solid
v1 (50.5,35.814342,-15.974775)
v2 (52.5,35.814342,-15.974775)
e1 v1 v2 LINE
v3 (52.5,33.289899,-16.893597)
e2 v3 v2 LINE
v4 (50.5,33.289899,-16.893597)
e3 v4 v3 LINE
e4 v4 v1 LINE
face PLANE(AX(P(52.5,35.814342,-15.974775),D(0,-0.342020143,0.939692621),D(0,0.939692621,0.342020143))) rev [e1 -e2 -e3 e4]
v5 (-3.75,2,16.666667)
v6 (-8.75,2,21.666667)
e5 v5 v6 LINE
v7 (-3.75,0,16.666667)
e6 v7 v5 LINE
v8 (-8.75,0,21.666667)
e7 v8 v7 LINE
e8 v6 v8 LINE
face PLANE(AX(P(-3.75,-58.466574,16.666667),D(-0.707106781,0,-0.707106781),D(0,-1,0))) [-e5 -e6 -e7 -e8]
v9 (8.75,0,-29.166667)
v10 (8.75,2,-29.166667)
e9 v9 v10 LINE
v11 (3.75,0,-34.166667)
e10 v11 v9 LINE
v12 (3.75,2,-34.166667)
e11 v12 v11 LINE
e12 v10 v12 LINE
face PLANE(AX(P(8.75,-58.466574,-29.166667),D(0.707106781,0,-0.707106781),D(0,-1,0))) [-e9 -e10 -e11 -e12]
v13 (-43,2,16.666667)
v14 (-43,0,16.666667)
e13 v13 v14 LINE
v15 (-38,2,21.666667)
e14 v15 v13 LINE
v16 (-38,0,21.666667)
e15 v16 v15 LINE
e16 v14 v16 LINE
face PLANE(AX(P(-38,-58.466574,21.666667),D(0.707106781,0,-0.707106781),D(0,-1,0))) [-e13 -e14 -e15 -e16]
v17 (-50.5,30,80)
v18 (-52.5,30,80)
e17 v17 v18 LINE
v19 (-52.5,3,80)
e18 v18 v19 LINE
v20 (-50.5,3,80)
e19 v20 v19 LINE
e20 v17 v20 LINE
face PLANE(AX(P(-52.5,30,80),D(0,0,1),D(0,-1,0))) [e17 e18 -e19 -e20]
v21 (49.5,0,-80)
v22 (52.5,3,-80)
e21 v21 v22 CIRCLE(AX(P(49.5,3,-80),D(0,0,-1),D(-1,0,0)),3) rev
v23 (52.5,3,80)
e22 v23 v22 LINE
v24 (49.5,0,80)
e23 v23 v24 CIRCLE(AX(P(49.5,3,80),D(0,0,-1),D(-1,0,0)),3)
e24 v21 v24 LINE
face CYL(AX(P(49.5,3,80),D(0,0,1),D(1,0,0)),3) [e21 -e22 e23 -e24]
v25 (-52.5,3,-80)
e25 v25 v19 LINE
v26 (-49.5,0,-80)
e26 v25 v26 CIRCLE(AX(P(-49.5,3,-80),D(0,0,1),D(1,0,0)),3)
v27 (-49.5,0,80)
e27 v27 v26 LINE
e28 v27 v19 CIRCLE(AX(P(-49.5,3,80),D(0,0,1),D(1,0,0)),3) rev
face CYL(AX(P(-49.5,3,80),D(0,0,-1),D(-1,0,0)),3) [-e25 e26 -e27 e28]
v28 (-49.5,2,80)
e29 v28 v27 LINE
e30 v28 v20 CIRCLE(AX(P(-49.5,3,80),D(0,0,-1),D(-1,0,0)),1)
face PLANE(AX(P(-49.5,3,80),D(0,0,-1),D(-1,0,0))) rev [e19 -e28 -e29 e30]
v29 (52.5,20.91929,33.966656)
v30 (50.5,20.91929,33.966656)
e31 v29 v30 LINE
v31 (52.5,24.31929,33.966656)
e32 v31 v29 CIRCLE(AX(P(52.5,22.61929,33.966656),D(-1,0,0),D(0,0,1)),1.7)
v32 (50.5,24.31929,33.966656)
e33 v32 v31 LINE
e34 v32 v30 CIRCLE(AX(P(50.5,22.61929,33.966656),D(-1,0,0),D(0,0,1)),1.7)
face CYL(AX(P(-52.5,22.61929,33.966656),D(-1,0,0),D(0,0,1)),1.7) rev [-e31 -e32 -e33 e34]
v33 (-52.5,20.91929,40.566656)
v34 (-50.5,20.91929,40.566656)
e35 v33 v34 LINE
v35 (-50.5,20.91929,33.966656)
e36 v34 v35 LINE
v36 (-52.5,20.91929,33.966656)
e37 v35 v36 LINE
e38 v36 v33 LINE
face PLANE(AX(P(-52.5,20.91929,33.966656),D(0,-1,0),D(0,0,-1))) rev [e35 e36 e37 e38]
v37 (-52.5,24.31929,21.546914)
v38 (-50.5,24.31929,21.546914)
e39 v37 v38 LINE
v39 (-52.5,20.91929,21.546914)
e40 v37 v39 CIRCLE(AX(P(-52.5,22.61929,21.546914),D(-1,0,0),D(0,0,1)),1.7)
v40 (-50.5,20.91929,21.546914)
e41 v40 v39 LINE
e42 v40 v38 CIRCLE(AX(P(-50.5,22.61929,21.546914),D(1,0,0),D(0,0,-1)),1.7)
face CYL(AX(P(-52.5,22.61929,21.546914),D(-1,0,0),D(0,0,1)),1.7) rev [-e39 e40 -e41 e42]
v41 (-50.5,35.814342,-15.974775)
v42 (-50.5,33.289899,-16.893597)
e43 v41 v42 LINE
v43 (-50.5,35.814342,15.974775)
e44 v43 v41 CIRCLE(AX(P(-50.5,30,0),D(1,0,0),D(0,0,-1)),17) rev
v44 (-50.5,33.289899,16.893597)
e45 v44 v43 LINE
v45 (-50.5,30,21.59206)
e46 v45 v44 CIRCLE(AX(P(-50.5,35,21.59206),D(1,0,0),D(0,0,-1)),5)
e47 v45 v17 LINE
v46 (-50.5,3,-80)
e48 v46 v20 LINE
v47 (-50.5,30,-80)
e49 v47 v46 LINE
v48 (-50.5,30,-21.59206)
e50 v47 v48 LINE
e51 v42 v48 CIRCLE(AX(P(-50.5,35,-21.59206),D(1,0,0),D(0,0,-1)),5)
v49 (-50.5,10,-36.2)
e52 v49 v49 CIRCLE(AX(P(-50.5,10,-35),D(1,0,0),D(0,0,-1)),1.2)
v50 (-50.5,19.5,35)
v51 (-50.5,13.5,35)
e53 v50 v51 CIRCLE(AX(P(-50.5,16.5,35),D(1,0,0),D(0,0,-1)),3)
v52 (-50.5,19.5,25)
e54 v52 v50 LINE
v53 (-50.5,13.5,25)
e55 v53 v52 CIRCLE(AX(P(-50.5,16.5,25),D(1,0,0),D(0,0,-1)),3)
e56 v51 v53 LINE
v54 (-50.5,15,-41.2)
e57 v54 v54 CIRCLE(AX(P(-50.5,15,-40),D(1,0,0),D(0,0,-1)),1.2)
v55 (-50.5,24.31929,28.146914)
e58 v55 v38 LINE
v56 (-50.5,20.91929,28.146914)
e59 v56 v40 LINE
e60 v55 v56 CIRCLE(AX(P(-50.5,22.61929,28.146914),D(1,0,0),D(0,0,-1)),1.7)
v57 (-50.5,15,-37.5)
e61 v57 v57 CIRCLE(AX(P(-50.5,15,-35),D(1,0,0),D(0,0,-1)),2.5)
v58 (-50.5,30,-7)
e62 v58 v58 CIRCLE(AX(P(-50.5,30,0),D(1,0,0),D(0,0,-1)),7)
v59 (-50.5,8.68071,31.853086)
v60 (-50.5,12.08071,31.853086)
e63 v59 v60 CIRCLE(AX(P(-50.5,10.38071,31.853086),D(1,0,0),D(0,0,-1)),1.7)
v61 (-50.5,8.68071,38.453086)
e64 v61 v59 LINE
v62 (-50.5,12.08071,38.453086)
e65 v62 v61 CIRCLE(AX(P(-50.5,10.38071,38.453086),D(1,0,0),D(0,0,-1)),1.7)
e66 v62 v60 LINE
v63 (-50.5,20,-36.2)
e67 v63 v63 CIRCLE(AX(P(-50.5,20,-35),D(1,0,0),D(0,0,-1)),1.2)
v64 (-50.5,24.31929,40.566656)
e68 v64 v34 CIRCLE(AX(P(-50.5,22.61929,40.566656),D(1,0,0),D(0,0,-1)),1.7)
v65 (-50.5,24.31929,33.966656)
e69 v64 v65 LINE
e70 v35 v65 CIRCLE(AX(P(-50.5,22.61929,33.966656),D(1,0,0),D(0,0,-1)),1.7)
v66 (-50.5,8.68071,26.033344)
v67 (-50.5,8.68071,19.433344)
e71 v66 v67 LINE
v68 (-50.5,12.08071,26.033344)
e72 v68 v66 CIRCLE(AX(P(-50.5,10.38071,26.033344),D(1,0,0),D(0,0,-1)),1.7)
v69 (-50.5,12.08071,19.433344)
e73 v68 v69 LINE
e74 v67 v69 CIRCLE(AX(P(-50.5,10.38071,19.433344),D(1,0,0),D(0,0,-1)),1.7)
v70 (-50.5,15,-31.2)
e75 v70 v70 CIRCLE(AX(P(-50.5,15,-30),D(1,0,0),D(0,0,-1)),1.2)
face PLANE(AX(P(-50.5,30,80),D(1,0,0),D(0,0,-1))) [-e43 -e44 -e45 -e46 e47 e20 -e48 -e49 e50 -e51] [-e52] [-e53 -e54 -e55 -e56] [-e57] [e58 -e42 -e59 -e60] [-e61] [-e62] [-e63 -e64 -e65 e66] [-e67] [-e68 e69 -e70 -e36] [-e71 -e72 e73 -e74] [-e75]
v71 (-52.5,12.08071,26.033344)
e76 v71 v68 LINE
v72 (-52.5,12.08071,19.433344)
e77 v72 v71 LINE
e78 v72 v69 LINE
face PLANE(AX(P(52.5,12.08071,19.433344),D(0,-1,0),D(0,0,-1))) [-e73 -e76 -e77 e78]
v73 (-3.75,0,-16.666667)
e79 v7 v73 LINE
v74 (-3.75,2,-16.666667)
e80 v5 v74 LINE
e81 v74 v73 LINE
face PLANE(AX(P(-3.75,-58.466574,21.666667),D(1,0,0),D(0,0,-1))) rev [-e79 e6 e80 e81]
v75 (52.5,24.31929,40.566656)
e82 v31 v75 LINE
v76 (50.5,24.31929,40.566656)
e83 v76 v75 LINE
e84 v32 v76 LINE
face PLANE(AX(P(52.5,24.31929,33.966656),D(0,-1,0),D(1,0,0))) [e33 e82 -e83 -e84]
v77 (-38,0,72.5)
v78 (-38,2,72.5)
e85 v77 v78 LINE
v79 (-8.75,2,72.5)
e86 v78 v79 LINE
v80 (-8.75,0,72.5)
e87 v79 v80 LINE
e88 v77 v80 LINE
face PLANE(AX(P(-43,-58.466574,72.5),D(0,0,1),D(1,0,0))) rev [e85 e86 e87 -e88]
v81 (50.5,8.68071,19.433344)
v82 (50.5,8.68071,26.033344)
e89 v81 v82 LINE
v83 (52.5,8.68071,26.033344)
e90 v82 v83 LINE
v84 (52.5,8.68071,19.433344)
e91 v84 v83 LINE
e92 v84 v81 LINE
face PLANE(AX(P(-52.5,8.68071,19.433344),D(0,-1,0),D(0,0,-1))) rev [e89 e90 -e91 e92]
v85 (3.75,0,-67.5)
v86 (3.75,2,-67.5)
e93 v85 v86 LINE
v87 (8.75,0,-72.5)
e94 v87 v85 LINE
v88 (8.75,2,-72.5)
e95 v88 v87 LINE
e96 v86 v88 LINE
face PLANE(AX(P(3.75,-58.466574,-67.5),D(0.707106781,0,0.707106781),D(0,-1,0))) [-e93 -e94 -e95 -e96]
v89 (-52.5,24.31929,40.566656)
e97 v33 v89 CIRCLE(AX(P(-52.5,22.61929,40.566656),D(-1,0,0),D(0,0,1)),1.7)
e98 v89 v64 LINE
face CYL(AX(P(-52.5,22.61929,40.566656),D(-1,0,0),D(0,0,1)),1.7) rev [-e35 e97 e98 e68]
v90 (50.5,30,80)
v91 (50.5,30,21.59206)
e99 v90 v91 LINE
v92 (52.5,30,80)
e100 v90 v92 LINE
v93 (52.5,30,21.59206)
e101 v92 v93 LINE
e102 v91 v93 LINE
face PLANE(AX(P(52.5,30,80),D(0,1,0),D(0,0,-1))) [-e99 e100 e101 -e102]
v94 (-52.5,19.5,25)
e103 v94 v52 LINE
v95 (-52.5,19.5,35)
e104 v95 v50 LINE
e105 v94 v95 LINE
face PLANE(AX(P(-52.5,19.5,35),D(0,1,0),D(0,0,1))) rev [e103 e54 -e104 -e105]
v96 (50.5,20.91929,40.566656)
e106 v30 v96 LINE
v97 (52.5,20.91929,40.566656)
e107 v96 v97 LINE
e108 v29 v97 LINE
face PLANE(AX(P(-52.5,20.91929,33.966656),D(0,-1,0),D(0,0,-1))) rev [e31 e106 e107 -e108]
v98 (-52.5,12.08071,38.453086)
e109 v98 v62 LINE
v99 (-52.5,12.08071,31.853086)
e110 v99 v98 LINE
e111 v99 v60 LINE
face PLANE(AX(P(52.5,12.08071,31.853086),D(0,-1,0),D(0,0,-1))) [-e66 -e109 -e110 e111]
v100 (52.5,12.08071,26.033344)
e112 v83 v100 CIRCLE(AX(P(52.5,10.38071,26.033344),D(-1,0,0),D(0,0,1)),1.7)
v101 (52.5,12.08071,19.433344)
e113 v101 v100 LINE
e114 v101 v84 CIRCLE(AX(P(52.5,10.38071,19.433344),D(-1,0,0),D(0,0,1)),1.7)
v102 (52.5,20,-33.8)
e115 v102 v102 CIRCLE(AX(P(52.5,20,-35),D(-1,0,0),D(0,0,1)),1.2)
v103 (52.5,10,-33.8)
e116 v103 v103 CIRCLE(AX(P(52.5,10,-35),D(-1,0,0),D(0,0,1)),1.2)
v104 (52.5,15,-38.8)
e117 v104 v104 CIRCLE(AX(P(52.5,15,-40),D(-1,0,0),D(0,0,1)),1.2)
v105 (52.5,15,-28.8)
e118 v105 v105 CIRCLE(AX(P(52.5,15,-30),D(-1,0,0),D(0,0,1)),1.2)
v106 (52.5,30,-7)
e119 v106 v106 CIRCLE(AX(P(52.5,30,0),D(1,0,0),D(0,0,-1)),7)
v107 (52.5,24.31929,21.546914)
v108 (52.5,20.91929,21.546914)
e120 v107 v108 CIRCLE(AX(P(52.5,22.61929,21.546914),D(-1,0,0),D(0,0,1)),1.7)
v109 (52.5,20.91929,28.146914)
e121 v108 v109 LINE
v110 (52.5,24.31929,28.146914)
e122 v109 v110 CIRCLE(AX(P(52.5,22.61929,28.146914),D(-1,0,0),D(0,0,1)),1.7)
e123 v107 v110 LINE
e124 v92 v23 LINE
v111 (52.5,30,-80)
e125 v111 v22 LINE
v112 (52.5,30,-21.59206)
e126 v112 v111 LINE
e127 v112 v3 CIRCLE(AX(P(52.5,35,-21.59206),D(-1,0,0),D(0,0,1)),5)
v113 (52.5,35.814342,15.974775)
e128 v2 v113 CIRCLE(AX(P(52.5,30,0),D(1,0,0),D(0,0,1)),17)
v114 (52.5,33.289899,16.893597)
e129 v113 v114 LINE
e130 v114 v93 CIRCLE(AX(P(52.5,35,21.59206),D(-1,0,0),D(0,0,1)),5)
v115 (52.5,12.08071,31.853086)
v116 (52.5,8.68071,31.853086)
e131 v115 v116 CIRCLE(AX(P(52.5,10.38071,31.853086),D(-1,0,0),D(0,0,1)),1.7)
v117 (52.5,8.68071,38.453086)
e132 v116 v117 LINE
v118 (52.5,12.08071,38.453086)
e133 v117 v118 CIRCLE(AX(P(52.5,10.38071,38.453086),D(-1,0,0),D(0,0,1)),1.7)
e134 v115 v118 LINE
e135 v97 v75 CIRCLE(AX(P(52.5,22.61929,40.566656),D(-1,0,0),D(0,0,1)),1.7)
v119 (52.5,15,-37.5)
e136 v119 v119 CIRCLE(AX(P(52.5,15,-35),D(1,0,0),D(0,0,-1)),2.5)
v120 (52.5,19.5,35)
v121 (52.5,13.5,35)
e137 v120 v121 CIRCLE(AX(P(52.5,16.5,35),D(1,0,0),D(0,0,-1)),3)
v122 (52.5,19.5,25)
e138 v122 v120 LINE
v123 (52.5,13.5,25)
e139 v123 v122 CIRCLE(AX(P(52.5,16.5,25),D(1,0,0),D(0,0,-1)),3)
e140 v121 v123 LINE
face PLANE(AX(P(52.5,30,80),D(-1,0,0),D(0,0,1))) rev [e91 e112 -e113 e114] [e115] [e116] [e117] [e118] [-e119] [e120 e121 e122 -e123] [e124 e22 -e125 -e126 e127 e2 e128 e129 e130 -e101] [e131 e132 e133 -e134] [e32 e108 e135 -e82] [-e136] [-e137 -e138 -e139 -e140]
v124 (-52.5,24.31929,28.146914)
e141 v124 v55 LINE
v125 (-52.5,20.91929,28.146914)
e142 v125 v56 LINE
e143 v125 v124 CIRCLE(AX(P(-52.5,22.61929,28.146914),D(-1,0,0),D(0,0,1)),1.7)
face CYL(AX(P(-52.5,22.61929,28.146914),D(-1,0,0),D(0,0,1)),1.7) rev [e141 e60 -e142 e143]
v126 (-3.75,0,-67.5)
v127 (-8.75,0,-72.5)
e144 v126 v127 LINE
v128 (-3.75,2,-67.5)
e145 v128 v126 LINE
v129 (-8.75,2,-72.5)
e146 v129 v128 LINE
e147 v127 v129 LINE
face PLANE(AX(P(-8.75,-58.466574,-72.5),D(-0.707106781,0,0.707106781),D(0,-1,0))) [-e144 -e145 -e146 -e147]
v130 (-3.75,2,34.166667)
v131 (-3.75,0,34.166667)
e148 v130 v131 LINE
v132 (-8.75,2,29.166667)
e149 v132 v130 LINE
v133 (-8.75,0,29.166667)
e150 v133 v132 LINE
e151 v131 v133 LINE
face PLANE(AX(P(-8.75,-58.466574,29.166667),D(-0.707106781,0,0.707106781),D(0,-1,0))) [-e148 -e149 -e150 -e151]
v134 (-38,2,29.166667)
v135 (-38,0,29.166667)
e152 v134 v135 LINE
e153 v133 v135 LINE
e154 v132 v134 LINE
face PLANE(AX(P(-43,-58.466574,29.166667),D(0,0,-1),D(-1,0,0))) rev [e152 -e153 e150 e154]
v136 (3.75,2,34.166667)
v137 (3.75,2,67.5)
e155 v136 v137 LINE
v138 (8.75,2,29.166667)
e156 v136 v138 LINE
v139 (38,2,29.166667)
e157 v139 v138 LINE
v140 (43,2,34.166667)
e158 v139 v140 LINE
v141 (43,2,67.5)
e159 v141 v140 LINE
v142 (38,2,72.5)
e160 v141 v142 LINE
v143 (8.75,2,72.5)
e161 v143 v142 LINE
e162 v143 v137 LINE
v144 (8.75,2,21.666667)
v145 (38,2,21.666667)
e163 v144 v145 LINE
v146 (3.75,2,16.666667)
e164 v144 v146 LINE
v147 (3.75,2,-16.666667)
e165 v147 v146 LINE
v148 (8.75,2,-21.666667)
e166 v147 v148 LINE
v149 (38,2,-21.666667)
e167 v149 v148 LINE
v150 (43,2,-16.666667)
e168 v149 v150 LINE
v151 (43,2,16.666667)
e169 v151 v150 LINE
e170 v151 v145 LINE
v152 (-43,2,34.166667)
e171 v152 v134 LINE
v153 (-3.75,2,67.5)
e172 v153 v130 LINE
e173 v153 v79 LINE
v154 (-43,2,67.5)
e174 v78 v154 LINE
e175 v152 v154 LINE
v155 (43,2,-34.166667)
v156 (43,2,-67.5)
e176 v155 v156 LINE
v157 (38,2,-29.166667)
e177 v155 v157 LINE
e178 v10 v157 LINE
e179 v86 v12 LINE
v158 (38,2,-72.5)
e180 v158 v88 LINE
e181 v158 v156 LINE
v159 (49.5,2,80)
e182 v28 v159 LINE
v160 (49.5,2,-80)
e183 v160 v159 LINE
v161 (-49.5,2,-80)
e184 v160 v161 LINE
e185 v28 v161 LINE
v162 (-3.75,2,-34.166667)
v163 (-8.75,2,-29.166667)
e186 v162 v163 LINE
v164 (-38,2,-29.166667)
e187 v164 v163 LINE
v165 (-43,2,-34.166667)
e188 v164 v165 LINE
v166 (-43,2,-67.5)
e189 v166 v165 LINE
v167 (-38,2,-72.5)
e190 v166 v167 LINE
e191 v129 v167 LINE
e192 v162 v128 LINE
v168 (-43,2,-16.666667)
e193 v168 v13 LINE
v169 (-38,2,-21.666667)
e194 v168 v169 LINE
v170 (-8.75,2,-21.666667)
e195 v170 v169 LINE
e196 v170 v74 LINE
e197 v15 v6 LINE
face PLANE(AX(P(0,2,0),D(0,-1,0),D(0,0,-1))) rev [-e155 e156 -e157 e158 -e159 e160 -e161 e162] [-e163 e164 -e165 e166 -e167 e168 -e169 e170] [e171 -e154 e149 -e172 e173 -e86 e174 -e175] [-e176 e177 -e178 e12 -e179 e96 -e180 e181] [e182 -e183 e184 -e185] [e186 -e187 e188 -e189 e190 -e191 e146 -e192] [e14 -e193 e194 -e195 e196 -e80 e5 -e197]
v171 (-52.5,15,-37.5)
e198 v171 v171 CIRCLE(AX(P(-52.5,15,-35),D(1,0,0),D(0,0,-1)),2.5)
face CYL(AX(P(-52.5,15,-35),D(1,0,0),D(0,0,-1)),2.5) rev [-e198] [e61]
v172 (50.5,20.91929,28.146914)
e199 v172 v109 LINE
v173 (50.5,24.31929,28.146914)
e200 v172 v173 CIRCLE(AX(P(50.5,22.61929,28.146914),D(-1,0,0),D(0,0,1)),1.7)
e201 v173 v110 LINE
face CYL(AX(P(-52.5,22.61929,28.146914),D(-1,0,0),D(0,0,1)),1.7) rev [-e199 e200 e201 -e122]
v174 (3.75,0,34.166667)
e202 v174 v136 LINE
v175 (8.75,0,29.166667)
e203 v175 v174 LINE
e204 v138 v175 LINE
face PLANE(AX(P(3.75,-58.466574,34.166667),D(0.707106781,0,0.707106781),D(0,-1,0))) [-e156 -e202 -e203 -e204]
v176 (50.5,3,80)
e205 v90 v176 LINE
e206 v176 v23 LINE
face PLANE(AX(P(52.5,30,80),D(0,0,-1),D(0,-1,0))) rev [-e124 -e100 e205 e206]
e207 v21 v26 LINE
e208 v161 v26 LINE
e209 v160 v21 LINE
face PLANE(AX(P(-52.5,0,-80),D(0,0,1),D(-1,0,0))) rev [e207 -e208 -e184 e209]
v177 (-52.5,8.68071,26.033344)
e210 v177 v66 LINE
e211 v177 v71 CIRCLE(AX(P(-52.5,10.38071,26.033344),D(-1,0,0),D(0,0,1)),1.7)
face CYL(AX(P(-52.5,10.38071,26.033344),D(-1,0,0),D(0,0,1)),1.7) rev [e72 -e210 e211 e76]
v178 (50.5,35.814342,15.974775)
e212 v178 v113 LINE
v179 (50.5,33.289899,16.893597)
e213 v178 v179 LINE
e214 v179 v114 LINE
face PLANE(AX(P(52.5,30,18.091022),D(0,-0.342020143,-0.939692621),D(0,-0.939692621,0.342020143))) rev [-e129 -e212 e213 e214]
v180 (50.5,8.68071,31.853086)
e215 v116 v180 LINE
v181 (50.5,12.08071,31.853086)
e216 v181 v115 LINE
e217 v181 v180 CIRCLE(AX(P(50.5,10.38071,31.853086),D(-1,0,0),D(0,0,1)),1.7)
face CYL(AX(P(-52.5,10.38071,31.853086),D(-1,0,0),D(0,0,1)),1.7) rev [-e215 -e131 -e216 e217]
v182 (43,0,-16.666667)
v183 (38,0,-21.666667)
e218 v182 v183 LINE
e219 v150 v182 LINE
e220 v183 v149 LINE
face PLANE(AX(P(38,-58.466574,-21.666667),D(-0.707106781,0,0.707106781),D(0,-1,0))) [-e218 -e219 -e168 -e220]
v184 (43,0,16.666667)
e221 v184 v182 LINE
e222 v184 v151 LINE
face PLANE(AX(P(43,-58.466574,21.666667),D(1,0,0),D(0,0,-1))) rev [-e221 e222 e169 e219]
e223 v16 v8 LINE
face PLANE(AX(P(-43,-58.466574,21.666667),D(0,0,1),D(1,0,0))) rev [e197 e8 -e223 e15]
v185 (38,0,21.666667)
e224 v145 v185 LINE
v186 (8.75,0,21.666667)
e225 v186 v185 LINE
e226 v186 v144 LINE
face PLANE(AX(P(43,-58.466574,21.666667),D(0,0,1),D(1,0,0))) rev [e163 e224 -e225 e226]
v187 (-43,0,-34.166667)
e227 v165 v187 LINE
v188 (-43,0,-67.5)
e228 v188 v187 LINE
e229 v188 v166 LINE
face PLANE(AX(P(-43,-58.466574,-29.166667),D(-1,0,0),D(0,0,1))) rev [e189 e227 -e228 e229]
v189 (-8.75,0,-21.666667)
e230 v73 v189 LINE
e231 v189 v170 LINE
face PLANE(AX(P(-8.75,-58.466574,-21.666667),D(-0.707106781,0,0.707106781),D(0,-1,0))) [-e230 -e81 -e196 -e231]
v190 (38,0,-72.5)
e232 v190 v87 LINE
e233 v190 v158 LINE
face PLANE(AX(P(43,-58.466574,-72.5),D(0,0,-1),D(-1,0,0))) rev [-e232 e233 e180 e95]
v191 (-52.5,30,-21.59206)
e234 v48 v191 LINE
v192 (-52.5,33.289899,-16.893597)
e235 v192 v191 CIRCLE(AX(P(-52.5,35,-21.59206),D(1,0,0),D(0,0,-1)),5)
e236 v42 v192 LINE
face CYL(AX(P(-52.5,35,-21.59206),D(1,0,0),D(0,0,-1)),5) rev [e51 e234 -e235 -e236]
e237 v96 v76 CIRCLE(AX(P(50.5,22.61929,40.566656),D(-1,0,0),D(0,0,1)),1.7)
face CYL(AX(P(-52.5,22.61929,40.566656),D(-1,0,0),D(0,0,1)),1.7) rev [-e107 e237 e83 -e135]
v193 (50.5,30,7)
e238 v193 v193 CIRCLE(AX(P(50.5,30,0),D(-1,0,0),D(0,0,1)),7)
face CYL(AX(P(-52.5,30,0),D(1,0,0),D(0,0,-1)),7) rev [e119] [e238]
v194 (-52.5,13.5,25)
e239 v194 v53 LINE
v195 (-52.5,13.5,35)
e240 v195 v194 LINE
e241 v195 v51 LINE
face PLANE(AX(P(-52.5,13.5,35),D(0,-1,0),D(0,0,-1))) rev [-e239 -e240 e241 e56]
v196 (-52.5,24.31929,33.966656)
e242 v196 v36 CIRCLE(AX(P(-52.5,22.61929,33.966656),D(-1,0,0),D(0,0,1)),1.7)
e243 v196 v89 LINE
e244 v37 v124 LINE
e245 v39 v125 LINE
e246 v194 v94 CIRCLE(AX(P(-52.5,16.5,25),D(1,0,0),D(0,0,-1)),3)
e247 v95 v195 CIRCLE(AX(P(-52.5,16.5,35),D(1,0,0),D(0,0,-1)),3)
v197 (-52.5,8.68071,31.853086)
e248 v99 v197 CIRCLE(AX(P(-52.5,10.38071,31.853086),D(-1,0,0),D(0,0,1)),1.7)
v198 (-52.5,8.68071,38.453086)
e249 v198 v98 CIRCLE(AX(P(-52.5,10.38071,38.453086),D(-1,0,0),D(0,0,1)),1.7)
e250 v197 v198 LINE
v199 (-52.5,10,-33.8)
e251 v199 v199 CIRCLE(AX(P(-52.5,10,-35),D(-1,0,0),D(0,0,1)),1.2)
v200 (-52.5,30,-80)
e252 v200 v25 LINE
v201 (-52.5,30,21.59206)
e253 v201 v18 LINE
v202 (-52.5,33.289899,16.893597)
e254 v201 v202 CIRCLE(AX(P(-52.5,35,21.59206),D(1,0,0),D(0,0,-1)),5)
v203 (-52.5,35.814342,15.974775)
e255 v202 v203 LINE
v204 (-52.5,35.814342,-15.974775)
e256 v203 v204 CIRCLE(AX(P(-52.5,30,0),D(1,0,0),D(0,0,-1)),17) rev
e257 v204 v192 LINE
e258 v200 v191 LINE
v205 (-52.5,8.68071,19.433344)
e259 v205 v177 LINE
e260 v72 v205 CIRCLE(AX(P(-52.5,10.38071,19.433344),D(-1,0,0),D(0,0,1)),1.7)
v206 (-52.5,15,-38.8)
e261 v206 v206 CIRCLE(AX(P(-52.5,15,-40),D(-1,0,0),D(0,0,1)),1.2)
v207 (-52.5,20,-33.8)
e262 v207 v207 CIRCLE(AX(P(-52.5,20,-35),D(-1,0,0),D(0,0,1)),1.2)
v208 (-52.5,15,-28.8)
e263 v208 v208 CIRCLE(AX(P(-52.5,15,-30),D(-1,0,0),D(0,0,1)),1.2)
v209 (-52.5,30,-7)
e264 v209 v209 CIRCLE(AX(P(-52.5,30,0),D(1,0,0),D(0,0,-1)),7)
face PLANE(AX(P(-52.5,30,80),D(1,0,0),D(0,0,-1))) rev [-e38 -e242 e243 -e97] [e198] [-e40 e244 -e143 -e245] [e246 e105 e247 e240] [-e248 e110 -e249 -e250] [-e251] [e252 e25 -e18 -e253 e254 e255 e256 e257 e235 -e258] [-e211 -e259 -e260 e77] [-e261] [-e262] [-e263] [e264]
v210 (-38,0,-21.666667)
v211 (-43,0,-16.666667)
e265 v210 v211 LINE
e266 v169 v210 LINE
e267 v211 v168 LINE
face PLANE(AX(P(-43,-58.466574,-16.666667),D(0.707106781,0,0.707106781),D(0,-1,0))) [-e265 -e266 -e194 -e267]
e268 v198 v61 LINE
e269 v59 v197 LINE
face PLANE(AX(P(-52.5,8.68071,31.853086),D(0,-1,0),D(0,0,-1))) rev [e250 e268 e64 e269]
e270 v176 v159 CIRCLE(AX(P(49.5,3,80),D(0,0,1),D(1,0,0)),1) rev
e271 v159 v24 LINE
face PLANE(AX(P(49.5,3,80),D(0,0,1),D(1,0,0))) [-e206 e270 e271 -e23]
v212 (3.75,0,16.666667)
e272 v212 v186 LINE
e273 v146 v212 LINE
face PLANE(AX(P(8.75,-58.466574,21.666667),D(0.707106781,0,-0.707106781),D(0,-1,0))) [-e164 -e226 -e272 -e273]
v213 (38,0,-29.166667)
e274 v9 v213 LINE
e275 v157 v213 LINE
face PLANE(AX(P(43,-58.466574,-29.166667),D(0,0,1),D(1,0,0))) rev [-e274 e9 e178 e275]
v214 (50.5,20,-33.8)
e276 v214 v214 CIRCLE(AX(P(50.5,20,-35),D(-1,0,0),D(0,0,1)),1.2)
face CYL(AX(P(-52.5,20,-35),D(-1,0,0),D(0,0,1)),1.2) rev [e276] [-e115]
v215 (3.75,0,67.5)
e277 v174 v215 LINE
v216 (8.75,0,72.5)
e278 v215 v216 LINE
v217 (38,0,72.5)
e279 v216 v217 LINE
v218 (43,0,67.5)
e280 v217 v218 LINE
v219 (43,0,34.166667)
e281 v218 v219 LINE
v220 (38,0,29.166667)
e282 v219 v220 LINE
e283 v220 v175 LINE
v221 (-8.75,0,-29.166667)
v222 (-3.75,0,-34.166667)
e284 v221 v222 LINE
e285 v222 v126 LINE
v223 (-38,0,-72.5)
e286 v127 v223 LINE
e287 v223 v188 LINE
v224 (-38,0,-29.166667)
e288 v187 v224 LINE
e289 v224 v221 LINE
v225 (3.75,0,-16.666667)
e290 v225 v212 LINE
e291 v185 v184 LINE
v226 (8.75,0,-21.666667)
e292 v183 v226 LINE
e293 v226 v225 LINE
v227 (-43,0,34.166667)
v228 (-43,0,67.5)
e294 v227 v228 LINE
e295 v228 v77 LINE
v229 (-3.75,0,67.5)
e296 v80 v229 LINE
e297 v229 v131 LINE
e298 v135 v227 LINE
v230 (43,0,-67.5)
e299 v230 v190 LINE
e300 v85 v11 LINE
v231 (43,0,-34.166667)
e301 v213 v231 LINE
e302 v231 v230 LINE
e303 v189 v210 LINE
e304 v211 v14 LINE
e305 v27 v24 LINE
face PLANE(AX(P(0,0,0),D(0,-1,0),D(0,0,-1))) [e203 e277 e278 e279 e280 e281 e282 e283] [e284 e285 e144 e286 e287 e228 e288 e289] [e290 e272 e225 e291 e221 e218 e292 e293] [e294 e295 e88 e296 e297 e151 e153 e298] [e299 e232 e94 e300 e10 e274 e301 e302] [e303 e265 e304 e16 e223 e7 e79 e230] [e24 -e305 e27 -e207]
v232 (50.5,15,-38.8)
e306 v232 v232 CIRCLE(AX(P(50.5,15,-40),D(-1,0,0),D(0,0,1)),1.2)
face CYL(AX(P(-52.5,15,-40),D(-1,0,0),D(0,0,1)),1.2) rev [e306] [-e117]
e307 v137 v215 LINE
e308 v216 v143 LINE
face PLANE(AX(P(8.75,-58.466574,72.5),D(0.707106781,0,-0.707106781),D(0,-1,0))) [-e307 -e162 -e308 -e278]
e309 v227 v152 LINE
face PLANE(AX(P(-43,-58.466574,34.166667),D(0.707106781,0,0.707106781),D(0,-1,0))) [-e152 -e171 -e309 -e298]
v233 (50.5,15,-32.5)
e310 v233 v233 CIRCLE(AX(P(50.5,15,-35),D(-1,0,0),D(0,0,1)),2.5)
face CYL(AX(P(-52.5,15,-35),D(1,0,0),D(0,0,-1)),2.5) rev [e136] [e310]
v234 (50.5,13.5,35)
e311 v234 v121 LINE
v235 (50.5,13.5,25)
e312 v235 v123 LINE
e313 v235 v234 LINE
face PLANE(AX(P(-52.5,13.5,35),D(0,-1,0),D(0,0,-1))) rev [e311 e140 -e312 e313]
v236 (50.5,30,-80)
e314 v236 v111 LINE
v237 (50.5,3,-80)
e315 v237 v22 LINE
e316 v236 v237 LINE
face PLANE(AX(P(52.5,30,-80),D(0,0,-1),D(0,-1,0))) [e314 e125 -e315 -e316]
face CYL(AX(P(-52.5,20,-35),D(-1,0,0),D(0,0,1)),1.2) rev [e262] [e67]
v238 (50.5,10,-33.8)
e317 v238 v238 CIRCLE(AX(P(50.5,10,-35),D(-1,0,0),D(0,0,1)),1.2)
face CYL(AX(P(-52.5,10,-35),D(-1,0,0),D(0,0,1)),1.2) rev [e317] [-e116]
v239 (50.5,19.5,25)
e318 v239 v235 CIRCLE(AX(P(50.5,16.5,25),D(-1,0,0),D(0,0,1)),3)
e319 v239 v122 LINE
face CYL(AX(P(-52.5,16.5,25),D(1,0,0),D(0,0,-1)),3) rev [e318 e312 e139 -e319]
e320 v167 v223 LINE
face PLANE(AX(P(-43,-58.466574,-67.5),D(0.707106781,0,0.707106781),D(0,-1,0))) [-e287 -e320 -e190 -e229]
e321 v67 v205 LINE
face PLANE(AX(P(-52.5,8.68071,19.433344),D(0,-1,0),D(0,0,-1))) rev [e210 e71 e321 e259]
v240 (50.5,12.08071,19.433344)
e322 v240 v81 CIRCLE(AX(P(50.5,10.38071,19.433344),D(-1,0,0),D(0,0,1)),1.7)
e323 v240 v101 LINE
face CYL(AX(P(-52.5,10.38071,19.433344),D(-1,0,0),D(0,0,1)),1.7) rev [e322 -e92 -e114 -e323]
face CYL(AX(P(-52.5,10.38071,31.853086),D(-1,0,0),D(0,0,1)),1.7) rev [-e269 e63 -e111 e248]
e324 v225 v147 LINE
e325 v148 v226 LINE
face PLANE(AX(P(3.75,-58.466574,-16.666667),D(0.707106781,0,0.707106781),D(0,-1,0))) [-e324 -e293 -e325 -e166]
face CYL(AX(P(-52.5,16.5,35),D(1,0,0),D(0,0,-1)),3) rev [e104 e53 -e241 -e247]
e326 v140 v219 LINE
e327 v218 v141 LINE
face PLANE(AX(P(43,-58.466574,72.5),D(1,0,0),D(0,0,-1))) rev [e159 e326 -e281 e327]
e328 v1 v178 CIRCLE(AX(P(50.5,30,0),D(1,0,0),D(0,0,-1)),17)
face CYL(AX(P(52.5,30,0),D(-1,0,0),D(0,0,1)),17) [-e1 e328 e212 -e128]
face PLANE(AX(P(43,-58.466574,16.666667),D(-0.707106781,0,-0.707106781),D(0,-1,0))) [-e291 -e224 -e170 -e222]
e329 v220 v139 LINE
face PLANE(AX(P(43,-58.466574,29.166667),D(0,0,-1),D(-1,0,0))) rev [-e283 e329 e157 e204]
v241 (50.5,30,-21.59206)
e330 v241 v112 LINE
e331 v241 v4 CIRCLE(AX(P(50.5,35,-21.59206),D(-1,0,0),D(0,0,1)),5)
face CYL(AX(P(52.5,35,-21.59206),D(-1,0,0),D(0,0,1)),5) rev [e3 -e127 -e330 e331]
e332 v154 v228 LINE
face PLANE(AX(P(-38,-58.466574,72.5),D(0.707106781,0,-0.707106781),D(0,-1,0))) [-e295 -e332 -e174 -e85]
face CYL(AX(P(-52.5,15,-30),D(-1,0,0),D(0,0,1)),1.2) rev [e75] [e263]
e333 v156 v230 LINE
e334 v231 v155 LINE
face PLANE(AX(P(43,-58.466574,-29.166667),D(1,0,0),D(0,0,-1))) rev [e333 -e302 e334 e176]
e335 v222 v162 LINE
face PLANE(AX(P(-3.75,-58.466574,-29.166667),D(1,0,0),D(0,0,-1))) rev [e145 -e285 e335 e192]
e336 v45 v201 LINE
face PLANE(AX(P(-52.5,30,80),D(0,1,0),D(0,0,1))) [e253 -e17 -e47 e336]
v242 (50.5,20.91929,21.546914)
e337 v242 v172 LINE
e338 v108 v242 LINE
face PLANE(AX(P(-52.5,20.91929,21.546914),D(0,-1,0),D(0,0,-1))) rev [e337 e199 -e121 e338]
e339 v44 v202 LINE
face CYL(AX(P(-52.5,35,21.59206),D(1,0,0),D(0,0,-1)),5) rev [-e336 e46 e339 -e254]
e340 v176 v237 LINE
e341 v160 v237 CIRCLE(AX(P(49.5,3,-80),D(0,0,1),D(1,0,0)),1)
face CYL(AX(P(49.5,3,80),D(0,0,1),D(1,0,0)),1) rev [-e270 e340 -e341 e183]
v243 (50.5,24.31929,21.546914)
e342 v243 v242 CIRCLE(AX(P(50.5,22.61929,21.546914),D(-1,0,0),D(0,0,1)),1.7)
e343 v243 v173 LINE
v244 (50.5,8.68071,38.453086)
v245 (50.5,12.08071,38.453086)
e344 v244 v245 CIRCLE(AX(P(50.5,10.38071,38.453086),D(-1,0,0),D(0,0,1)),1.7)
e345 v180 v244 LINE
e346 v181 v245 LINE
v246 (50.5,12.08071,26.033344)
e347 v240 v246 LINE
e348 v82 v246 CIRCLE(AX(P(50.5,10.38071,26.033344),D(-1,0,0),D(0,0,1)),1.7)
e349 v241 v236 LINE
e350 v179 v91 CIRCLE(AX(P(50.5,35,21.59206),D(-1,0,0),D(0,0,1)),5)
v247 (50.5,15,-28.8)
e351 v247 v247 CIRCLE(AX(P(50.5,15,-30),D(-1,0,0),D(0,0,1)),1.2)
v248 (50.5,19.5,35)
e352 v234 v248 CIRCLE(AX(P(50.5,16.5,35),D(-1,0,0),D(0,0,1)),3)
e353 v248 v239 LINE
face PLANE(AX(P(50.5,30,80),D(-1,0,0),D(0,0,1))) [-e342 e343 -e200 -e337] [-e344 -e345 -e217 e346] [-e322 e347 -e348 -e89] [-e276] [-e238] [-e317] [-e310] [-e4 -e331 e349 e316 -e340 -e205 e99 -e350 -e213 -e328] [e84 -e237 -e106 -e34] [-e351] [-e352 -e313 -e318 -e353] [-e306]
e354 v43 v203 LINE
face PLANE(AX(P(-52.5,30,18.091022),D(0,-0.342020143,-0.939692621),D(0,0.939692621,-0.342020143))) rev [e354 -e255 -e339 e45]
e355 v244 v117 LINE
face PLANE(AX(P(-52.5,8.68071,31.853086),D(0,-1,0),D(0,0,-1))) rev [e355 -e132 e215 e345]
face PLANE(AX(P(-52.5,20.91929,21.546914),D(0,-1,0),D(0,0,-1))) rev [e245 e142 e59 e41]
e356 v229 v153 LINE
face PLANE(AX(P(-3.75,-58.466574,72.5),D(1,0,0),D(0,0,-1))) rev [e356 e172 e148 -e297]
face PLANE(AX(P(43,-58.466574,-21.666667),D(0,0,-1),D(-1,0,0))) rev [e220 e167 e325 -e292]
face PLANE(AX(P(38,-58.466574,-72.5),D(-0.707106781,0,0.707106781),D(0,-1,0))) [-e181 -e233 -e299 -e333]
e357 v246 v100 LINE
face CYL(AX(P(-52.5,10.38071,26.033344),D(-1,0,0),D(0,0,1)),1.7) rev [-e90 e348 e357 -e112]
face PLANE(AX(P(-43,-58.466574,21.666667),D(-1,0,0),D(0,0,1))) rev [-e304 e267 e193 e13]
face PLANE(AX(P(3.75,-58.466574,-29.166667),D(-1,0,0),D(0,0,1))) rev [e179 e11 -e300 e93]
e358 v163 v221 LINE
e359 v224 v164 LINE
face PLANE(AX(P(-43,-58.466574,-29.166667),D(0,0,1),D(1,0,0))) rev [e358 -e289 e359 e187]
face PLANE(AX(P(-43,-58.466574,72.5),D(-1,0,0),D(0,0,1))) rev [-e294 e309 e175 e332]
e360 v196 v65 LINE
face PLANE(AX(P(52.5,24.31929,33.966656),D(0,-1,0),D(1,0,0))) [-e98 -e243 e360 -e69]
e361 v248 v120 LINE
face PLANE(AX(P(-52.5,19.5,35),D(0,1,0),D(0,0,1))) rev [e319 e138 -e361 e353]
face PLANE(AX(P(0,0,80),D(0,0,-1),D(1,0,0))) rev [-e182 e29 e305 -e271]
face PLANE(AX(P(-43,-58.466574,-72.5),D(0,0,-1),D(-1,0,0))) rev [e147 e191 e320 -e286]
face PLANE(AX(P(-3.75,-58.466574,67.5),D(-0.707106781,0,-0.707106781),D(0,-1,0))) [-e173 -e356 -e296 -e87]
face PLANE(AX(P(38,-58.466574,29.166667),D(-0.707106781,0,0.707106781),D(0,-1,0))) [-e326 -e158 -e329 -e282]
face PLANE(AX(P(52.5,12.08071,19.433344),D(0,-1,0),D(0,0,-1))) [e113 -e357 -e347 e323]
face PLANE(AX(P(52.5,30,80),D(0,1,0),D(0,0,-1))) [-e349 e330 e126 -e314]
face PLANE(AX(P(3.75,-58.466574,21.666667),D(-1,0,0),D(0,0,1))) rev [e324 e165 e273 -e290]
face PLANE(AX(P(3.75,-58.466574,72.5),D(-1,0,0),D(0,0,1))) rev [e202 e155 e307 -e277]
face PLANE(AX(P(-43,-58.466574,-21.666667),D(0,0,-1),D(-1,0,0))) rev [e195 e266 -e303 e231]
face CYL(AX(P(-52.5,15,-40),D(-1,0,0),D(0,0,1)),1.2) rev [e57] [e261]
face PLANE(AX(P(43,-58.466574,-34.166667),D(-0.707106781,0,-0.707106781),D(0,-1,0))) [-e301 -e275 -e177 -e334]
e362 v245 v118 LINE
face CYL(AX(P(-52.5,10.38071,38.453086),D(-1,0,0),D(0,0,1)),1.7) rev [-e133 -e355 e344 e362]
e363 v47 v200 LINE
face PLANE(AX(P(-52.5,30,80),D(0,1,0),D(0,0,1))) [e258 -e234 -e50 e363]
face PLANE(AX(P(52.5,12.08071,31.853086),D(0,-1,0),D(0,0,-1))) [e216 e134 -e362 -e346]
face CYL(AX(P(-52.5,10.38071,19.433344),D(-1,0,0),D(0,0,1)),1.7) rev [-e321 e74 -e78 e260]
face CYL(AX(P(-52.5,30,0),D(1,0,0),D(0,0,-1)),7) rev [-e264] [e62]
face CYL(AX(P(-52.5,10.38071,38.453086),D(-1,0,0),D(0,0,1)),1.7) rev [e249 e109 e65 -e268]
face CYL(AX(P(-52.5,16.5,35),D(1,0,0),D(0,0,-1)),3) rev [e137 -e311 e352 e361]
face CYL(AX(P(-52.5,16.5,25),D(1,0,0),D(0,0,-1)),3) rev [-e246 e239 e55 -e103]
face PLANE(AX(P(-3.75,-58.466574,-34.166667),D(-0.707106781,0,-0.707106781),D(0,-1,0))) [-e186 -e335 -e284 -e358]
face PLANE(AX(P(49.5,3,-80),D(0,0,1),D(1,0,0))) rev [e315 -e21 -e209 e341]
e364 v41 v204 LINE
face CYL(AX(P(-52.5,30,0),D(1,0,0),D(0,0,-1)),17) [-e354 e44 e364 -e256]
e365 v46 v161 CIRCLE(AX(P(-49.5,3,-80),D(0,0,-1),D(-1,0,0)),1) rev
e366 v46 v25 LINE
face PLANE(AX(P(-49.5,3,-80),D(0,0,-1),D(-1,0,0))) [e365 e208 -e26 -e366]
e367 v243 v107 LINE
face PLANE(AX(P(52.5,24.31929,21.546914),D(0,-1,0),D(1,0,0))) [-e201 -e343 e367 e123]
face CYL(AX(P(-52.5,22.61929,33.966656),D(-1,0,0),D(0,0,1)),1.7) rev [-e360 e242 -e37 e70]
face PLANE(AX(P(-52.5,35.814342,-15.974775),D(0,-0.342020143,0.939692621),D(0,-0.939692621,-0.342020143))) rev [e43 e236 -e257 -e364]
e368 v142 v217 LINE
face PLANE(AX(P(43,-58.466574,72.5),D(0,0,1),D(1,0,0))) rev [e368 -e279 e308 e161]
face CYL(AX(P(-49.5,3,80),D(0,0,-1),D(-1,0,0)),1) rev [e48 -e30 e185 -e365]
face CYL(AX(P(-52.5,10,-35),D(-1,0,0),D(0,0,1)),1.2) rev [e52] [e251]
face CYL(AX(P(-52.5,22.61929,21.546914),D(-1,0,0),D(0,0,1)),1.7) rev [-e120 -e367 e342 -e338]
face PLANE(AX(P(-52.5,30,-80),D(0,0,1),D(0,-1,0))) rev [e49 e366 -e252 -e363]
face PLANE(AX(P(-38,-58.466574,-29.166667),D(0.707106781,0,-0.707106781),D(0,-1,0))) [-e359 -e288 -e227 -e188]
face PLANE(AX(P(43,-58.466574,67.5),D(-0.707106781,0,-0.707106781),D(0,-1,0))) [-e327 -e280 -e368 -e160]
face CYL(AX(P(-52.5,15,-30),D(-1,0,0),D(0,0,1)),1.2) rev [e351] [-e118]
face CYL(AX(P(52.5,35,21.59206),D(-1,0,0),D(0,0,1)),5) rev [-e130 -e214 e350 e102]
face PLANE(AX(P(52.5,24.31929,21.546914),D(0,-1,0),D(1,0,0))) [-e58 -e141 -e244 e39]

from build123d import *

# Parameters (mm, degrees)
BOSS_EXTRUDE1_DEPTH       = 30
BOSS_EXTRUDE2_DEPTH       = 105
FILLET1_R                 = 5
CONVERT_SOLID2_START      = -80
CONVERT_SOLID2_DEPTH      = 160
SKETCH12_R                = 7
SKETCH12_R_2              = 2.5
AXLE_HOLES_DEPTH          = 141.121375957
SKETCH13_W                = 39.25
SKETCH13_H                = 43.333333333
SKETCH13_H_2              = 43.333333334
WEIGHT_SAVING_HOLES_DEPTH = 2
CHAMFER1_SIZE             = 5
M3_START                  = -52.5
M3_CLEARANCE_SLOT1_DEPTH  = 105
M2_CLEARANCE_HOLE1_D      = 2.4


# Read off the part's stored shape, not the designer's step: Convert-Solid2, M3 Clearance Slot1
with BuildPart() as part:
    # Sketch1 → Boss-Extrude1 (new body)
    with BuildSketch(Plane(origin=(0, 0, 0), x_dir=(1, 0, 0), z_dir=(0, 1, 0))):
        Polygon((-52.5, -80), (0, -80), (52.5, -80), (52.5, 80), (-52.5, 80), align=None)
    extrude(amount=BOSS_EXTRUDE1_DEPTH)

    # Sketch11 → Boss-Extrude2 (add)
    with BuildSketch(Plane(origin=(52.5, 0, 0), x_dir=(0, 0, -1), z_dir=(1, 0, 0))):
        with BuildLine():
            Line((-18.091022132, 30), (-15.974774553, 35.814342437))
            ThreePointArc((-15.974774553, 35.814342437), (0, 47), (15.974774553, 35.814342437))
            Line((15.974774553, 35.814342437), (18.091022132, 30))
            Line((18.091022132, 30), (-18.091022132, 30))
        make_face()
    extrude(amount=-BOSS_EXTRUDE2_DEPTH)

    # Fillet1
    fillet1_edges = [part.edges().sort_by_distance(p)[0] for p in [
        (0, 30, -18.091022132),
        (0, 30, 18.091022132),
    ]]
    fillet(fillet1_edges, radius=FILLET1_R)

    # Convert-Solid2 outline → Convert-Solid2 (cut)
    with BuildSketch(Plane.XY.offset(CONVERT_SOLID2_START)):
        with BuildLine():
            Line((-54, 5.2e-08), (-49.5, 0))
            ThreePointArc((-49.5, 0), (-51.621320344, 0.878679656), (-52.5, 3))
            Line((-52.5, 3), (-52.499999977, 48))
            Line((-52.499999977, 48), (-54, 48))
            Line((-54, 48), (-54, 5.2e-08))
        make_face()
        with BuildLine():
            ThreePointArc((52.5, 3), (51.621320344, 0.878679656), (49.5, 0))
            Line((49.5, 0), (54, 5.2e-08))
            Line((54, 5.2e-08), (54, 48))
            Line((54, 48), (52.499999977, 48))
            Line((52.499999977, 48), (52.5, 3))
        make_face()
        with BuildLine():
            Line((50.5, 3), (50.5, 48))
            Line((50.5, 48), (-50.5, 48))
            Line((-50.5, 48), (-50.5, 3))
            ThreePointArc((-50.5, 3), (-50.207106781, 2.292893219), (-49.5, 2))
            Line((-49.5, 2), (49.5, 2))
            ThreePointArc((49.5, 2), (50.207106781, 2.292893219), (50.5, 3))
        make_face()
    extrude(amount=CONVERT_SOLID2_DEPTH, mode=Mode.SUBTRACT)

    # Sketch12 → Axle Holes (cut, through all)
    with BuildSketch(Plane(origin=(52.5, 0, 0), x_dir=(0, 0, -1), z_dir=(1, 0, 0))):
        with Locations((0, 30)):
            Circle(SKETCH12_R)
        with Locations((35, 15)):
            Circle(SKETCH12_R_2)
        with BuildLine():
            Line((-35, 19.5), (-25, 19.5))
            ThreePointArc((-25, 19.5), (-22, 16.5), (-25, 13.5))
            Line((-25, 13.5), (-35, 13.5))
            ThreePointArc((-35, 13.5), (-38, 16.5), (-35, 19.5))
        make_face()
    extrude(amount=-AXLE_HOLES_DEPTH, mode=Mode.SUBTRACT)

    # Sketch13 → Weight Saving Holes (cut)
    with BuildSketch(Plane(origin=(0, 2, 0), x_dir=(1, 0, 0), z_dir=(0, 1, 0))):
        with Locations((-23.375, 50.833333334)):
            Rectangle(SKETCH13_W, SKETCH13_H)
        with Locations((-23.375, 0)):
            Rectangle(SKETCH13_W, SKETCH13_H_2)
        with Locations((-23.375, -50.833333334)):
            Rectangle(SKETCH13_W, SKETCH13_H)
        with Locations((23.375, -50.833333334)):
            Rectangle(SKETCH13_W, SKETCH13_H)
        with Locations((23.375, 0)):
            Rectangle(SKETCH13_W, SKETCH13_H_2)
        with Locations((23.375, 50.833333334)):
            Rectangle(SKETCH13_W, SKETCH13_H)
    extrude(amount=-WEIGHT_SAVING_HOLES_DEPTH, mode=Mode.SUBTRACT)

    # Chamfer1
    chamfer1_edges = [part.edges().sort_by_distance(p)[0] for p in [
        (43, 1, -72.5),
        (3.75, 1, -72.5),
        (3.75, 1, -29.166666667),
        (43, 1, -29.166666667),
        (43, 1, -21.666666667),
        (3.75, 1, -21.666666667),
        (3.75, 1, 21.666666667),
        (43, 1, 21.666666667),
        (43, 1, 29.166666667),
        (3.75, 1, 29.166666667),
        (3.75, 1, 72.5),
        (43, 1, 72.5),
        (-43, 1, 29.166666667),
        (-43, 1, 72.5),
        (-3.75, 1, 72.5),
        (-3.75, 1, 29.166666667),
        (-43, 1, -21.666666667),
        (-43, 1, 21.666666667),
        (-3.75, 1, 21.666666667),
        (-3.75, 1, -21.666666667),
        (-43, 1, -72.5),
        (-43, 1, -29.166666667),
        (-3.75, 1, -29.166666667),
        (-3.75, 1, -72.5),
    ]]
    chamfer(chamfer1_edges, length=CHAMFER1_SIZE)

    # M3 Clearance Slot1 outline → M3 Clearance Slot1 (cut)
    with BuildSketch(Plane.YZ.offset(M3_START)):
        with BuildLine():
            ThreePointArc((12.080710415, 26.033343618), (10.380710415, 27.733343618), (8.680710415, 26.033343618))
            Line((8.680710415, 26.033343618), (8.680710415, 19.433343618))
            ThreePointArc((8.680710415, 19.433343618), (10.380710415, 17.733343618), (12.080710415, 19.433343618))
            Line((12.080710415, 19.433343618), (12.080710415, 26.033343618))
        make_face()
        with BuildLine():
            ThreePointArc((12.080710415, 38.453085966), (10.380710415, 40.153085966), (8.680710415, 38.453085966))
            Line((8.680710415, 38.453085966), (8.680710415, 31.853085966))
            ThreePointArc((8.680710415, 31.853085966), (10.380710415, 30.153085966), (12.080710415, 31.853085966))
            Line((12.080710415, 31.853085966), (12.080710415, 38.453085966))
        make_face()
        with BuildLine():
            ThreePointArc((24.319289585, 40.566656382), (22.619289585, 42.266656382), (20.919289585, 40.566656382))
            Line((20.919289585, 40.566656382), (20.919289585, 33.966656382))
            ThreePointArc((20.919289585, 33.966656382), (22.619289585, 32.266656382), (24.319289585, 33.966656382))
            Line((24.319289585, 33.966656382), (24.319289585, 40.566656382))
        make_face()
        with BuildLine():
            ThreePointArc((24.319289585, 28.146914034), (22.619289585, 29.846914034), (20.919289585, 28.146914034))
            Line((20.919289585, 28.146914034), (20.919289585, 21.546914034))
            ThreePointArc((20.919289585, 21.546914034), (22.619289585, 19.846914034), (24.319289585, 21.546914034))
            Line((24.319289585, 21.546914034), (24.319289585, 28.146914034))
        make_face()
    extrude(amount=M3_CLEARANCE_SLOT1_DEPTH, mode=Mode.SUBTRACT)

    # M2 Clearance Hole1 (through all)
    with Locations(Plane.ZY.offset(52.5)):
        with Locations((-35, 20), (-30, 15), (-35, 10), (-40, 15)):
            Hole(M2_CLEARANCE_HOLE1_D / 2)


solid = part.part
